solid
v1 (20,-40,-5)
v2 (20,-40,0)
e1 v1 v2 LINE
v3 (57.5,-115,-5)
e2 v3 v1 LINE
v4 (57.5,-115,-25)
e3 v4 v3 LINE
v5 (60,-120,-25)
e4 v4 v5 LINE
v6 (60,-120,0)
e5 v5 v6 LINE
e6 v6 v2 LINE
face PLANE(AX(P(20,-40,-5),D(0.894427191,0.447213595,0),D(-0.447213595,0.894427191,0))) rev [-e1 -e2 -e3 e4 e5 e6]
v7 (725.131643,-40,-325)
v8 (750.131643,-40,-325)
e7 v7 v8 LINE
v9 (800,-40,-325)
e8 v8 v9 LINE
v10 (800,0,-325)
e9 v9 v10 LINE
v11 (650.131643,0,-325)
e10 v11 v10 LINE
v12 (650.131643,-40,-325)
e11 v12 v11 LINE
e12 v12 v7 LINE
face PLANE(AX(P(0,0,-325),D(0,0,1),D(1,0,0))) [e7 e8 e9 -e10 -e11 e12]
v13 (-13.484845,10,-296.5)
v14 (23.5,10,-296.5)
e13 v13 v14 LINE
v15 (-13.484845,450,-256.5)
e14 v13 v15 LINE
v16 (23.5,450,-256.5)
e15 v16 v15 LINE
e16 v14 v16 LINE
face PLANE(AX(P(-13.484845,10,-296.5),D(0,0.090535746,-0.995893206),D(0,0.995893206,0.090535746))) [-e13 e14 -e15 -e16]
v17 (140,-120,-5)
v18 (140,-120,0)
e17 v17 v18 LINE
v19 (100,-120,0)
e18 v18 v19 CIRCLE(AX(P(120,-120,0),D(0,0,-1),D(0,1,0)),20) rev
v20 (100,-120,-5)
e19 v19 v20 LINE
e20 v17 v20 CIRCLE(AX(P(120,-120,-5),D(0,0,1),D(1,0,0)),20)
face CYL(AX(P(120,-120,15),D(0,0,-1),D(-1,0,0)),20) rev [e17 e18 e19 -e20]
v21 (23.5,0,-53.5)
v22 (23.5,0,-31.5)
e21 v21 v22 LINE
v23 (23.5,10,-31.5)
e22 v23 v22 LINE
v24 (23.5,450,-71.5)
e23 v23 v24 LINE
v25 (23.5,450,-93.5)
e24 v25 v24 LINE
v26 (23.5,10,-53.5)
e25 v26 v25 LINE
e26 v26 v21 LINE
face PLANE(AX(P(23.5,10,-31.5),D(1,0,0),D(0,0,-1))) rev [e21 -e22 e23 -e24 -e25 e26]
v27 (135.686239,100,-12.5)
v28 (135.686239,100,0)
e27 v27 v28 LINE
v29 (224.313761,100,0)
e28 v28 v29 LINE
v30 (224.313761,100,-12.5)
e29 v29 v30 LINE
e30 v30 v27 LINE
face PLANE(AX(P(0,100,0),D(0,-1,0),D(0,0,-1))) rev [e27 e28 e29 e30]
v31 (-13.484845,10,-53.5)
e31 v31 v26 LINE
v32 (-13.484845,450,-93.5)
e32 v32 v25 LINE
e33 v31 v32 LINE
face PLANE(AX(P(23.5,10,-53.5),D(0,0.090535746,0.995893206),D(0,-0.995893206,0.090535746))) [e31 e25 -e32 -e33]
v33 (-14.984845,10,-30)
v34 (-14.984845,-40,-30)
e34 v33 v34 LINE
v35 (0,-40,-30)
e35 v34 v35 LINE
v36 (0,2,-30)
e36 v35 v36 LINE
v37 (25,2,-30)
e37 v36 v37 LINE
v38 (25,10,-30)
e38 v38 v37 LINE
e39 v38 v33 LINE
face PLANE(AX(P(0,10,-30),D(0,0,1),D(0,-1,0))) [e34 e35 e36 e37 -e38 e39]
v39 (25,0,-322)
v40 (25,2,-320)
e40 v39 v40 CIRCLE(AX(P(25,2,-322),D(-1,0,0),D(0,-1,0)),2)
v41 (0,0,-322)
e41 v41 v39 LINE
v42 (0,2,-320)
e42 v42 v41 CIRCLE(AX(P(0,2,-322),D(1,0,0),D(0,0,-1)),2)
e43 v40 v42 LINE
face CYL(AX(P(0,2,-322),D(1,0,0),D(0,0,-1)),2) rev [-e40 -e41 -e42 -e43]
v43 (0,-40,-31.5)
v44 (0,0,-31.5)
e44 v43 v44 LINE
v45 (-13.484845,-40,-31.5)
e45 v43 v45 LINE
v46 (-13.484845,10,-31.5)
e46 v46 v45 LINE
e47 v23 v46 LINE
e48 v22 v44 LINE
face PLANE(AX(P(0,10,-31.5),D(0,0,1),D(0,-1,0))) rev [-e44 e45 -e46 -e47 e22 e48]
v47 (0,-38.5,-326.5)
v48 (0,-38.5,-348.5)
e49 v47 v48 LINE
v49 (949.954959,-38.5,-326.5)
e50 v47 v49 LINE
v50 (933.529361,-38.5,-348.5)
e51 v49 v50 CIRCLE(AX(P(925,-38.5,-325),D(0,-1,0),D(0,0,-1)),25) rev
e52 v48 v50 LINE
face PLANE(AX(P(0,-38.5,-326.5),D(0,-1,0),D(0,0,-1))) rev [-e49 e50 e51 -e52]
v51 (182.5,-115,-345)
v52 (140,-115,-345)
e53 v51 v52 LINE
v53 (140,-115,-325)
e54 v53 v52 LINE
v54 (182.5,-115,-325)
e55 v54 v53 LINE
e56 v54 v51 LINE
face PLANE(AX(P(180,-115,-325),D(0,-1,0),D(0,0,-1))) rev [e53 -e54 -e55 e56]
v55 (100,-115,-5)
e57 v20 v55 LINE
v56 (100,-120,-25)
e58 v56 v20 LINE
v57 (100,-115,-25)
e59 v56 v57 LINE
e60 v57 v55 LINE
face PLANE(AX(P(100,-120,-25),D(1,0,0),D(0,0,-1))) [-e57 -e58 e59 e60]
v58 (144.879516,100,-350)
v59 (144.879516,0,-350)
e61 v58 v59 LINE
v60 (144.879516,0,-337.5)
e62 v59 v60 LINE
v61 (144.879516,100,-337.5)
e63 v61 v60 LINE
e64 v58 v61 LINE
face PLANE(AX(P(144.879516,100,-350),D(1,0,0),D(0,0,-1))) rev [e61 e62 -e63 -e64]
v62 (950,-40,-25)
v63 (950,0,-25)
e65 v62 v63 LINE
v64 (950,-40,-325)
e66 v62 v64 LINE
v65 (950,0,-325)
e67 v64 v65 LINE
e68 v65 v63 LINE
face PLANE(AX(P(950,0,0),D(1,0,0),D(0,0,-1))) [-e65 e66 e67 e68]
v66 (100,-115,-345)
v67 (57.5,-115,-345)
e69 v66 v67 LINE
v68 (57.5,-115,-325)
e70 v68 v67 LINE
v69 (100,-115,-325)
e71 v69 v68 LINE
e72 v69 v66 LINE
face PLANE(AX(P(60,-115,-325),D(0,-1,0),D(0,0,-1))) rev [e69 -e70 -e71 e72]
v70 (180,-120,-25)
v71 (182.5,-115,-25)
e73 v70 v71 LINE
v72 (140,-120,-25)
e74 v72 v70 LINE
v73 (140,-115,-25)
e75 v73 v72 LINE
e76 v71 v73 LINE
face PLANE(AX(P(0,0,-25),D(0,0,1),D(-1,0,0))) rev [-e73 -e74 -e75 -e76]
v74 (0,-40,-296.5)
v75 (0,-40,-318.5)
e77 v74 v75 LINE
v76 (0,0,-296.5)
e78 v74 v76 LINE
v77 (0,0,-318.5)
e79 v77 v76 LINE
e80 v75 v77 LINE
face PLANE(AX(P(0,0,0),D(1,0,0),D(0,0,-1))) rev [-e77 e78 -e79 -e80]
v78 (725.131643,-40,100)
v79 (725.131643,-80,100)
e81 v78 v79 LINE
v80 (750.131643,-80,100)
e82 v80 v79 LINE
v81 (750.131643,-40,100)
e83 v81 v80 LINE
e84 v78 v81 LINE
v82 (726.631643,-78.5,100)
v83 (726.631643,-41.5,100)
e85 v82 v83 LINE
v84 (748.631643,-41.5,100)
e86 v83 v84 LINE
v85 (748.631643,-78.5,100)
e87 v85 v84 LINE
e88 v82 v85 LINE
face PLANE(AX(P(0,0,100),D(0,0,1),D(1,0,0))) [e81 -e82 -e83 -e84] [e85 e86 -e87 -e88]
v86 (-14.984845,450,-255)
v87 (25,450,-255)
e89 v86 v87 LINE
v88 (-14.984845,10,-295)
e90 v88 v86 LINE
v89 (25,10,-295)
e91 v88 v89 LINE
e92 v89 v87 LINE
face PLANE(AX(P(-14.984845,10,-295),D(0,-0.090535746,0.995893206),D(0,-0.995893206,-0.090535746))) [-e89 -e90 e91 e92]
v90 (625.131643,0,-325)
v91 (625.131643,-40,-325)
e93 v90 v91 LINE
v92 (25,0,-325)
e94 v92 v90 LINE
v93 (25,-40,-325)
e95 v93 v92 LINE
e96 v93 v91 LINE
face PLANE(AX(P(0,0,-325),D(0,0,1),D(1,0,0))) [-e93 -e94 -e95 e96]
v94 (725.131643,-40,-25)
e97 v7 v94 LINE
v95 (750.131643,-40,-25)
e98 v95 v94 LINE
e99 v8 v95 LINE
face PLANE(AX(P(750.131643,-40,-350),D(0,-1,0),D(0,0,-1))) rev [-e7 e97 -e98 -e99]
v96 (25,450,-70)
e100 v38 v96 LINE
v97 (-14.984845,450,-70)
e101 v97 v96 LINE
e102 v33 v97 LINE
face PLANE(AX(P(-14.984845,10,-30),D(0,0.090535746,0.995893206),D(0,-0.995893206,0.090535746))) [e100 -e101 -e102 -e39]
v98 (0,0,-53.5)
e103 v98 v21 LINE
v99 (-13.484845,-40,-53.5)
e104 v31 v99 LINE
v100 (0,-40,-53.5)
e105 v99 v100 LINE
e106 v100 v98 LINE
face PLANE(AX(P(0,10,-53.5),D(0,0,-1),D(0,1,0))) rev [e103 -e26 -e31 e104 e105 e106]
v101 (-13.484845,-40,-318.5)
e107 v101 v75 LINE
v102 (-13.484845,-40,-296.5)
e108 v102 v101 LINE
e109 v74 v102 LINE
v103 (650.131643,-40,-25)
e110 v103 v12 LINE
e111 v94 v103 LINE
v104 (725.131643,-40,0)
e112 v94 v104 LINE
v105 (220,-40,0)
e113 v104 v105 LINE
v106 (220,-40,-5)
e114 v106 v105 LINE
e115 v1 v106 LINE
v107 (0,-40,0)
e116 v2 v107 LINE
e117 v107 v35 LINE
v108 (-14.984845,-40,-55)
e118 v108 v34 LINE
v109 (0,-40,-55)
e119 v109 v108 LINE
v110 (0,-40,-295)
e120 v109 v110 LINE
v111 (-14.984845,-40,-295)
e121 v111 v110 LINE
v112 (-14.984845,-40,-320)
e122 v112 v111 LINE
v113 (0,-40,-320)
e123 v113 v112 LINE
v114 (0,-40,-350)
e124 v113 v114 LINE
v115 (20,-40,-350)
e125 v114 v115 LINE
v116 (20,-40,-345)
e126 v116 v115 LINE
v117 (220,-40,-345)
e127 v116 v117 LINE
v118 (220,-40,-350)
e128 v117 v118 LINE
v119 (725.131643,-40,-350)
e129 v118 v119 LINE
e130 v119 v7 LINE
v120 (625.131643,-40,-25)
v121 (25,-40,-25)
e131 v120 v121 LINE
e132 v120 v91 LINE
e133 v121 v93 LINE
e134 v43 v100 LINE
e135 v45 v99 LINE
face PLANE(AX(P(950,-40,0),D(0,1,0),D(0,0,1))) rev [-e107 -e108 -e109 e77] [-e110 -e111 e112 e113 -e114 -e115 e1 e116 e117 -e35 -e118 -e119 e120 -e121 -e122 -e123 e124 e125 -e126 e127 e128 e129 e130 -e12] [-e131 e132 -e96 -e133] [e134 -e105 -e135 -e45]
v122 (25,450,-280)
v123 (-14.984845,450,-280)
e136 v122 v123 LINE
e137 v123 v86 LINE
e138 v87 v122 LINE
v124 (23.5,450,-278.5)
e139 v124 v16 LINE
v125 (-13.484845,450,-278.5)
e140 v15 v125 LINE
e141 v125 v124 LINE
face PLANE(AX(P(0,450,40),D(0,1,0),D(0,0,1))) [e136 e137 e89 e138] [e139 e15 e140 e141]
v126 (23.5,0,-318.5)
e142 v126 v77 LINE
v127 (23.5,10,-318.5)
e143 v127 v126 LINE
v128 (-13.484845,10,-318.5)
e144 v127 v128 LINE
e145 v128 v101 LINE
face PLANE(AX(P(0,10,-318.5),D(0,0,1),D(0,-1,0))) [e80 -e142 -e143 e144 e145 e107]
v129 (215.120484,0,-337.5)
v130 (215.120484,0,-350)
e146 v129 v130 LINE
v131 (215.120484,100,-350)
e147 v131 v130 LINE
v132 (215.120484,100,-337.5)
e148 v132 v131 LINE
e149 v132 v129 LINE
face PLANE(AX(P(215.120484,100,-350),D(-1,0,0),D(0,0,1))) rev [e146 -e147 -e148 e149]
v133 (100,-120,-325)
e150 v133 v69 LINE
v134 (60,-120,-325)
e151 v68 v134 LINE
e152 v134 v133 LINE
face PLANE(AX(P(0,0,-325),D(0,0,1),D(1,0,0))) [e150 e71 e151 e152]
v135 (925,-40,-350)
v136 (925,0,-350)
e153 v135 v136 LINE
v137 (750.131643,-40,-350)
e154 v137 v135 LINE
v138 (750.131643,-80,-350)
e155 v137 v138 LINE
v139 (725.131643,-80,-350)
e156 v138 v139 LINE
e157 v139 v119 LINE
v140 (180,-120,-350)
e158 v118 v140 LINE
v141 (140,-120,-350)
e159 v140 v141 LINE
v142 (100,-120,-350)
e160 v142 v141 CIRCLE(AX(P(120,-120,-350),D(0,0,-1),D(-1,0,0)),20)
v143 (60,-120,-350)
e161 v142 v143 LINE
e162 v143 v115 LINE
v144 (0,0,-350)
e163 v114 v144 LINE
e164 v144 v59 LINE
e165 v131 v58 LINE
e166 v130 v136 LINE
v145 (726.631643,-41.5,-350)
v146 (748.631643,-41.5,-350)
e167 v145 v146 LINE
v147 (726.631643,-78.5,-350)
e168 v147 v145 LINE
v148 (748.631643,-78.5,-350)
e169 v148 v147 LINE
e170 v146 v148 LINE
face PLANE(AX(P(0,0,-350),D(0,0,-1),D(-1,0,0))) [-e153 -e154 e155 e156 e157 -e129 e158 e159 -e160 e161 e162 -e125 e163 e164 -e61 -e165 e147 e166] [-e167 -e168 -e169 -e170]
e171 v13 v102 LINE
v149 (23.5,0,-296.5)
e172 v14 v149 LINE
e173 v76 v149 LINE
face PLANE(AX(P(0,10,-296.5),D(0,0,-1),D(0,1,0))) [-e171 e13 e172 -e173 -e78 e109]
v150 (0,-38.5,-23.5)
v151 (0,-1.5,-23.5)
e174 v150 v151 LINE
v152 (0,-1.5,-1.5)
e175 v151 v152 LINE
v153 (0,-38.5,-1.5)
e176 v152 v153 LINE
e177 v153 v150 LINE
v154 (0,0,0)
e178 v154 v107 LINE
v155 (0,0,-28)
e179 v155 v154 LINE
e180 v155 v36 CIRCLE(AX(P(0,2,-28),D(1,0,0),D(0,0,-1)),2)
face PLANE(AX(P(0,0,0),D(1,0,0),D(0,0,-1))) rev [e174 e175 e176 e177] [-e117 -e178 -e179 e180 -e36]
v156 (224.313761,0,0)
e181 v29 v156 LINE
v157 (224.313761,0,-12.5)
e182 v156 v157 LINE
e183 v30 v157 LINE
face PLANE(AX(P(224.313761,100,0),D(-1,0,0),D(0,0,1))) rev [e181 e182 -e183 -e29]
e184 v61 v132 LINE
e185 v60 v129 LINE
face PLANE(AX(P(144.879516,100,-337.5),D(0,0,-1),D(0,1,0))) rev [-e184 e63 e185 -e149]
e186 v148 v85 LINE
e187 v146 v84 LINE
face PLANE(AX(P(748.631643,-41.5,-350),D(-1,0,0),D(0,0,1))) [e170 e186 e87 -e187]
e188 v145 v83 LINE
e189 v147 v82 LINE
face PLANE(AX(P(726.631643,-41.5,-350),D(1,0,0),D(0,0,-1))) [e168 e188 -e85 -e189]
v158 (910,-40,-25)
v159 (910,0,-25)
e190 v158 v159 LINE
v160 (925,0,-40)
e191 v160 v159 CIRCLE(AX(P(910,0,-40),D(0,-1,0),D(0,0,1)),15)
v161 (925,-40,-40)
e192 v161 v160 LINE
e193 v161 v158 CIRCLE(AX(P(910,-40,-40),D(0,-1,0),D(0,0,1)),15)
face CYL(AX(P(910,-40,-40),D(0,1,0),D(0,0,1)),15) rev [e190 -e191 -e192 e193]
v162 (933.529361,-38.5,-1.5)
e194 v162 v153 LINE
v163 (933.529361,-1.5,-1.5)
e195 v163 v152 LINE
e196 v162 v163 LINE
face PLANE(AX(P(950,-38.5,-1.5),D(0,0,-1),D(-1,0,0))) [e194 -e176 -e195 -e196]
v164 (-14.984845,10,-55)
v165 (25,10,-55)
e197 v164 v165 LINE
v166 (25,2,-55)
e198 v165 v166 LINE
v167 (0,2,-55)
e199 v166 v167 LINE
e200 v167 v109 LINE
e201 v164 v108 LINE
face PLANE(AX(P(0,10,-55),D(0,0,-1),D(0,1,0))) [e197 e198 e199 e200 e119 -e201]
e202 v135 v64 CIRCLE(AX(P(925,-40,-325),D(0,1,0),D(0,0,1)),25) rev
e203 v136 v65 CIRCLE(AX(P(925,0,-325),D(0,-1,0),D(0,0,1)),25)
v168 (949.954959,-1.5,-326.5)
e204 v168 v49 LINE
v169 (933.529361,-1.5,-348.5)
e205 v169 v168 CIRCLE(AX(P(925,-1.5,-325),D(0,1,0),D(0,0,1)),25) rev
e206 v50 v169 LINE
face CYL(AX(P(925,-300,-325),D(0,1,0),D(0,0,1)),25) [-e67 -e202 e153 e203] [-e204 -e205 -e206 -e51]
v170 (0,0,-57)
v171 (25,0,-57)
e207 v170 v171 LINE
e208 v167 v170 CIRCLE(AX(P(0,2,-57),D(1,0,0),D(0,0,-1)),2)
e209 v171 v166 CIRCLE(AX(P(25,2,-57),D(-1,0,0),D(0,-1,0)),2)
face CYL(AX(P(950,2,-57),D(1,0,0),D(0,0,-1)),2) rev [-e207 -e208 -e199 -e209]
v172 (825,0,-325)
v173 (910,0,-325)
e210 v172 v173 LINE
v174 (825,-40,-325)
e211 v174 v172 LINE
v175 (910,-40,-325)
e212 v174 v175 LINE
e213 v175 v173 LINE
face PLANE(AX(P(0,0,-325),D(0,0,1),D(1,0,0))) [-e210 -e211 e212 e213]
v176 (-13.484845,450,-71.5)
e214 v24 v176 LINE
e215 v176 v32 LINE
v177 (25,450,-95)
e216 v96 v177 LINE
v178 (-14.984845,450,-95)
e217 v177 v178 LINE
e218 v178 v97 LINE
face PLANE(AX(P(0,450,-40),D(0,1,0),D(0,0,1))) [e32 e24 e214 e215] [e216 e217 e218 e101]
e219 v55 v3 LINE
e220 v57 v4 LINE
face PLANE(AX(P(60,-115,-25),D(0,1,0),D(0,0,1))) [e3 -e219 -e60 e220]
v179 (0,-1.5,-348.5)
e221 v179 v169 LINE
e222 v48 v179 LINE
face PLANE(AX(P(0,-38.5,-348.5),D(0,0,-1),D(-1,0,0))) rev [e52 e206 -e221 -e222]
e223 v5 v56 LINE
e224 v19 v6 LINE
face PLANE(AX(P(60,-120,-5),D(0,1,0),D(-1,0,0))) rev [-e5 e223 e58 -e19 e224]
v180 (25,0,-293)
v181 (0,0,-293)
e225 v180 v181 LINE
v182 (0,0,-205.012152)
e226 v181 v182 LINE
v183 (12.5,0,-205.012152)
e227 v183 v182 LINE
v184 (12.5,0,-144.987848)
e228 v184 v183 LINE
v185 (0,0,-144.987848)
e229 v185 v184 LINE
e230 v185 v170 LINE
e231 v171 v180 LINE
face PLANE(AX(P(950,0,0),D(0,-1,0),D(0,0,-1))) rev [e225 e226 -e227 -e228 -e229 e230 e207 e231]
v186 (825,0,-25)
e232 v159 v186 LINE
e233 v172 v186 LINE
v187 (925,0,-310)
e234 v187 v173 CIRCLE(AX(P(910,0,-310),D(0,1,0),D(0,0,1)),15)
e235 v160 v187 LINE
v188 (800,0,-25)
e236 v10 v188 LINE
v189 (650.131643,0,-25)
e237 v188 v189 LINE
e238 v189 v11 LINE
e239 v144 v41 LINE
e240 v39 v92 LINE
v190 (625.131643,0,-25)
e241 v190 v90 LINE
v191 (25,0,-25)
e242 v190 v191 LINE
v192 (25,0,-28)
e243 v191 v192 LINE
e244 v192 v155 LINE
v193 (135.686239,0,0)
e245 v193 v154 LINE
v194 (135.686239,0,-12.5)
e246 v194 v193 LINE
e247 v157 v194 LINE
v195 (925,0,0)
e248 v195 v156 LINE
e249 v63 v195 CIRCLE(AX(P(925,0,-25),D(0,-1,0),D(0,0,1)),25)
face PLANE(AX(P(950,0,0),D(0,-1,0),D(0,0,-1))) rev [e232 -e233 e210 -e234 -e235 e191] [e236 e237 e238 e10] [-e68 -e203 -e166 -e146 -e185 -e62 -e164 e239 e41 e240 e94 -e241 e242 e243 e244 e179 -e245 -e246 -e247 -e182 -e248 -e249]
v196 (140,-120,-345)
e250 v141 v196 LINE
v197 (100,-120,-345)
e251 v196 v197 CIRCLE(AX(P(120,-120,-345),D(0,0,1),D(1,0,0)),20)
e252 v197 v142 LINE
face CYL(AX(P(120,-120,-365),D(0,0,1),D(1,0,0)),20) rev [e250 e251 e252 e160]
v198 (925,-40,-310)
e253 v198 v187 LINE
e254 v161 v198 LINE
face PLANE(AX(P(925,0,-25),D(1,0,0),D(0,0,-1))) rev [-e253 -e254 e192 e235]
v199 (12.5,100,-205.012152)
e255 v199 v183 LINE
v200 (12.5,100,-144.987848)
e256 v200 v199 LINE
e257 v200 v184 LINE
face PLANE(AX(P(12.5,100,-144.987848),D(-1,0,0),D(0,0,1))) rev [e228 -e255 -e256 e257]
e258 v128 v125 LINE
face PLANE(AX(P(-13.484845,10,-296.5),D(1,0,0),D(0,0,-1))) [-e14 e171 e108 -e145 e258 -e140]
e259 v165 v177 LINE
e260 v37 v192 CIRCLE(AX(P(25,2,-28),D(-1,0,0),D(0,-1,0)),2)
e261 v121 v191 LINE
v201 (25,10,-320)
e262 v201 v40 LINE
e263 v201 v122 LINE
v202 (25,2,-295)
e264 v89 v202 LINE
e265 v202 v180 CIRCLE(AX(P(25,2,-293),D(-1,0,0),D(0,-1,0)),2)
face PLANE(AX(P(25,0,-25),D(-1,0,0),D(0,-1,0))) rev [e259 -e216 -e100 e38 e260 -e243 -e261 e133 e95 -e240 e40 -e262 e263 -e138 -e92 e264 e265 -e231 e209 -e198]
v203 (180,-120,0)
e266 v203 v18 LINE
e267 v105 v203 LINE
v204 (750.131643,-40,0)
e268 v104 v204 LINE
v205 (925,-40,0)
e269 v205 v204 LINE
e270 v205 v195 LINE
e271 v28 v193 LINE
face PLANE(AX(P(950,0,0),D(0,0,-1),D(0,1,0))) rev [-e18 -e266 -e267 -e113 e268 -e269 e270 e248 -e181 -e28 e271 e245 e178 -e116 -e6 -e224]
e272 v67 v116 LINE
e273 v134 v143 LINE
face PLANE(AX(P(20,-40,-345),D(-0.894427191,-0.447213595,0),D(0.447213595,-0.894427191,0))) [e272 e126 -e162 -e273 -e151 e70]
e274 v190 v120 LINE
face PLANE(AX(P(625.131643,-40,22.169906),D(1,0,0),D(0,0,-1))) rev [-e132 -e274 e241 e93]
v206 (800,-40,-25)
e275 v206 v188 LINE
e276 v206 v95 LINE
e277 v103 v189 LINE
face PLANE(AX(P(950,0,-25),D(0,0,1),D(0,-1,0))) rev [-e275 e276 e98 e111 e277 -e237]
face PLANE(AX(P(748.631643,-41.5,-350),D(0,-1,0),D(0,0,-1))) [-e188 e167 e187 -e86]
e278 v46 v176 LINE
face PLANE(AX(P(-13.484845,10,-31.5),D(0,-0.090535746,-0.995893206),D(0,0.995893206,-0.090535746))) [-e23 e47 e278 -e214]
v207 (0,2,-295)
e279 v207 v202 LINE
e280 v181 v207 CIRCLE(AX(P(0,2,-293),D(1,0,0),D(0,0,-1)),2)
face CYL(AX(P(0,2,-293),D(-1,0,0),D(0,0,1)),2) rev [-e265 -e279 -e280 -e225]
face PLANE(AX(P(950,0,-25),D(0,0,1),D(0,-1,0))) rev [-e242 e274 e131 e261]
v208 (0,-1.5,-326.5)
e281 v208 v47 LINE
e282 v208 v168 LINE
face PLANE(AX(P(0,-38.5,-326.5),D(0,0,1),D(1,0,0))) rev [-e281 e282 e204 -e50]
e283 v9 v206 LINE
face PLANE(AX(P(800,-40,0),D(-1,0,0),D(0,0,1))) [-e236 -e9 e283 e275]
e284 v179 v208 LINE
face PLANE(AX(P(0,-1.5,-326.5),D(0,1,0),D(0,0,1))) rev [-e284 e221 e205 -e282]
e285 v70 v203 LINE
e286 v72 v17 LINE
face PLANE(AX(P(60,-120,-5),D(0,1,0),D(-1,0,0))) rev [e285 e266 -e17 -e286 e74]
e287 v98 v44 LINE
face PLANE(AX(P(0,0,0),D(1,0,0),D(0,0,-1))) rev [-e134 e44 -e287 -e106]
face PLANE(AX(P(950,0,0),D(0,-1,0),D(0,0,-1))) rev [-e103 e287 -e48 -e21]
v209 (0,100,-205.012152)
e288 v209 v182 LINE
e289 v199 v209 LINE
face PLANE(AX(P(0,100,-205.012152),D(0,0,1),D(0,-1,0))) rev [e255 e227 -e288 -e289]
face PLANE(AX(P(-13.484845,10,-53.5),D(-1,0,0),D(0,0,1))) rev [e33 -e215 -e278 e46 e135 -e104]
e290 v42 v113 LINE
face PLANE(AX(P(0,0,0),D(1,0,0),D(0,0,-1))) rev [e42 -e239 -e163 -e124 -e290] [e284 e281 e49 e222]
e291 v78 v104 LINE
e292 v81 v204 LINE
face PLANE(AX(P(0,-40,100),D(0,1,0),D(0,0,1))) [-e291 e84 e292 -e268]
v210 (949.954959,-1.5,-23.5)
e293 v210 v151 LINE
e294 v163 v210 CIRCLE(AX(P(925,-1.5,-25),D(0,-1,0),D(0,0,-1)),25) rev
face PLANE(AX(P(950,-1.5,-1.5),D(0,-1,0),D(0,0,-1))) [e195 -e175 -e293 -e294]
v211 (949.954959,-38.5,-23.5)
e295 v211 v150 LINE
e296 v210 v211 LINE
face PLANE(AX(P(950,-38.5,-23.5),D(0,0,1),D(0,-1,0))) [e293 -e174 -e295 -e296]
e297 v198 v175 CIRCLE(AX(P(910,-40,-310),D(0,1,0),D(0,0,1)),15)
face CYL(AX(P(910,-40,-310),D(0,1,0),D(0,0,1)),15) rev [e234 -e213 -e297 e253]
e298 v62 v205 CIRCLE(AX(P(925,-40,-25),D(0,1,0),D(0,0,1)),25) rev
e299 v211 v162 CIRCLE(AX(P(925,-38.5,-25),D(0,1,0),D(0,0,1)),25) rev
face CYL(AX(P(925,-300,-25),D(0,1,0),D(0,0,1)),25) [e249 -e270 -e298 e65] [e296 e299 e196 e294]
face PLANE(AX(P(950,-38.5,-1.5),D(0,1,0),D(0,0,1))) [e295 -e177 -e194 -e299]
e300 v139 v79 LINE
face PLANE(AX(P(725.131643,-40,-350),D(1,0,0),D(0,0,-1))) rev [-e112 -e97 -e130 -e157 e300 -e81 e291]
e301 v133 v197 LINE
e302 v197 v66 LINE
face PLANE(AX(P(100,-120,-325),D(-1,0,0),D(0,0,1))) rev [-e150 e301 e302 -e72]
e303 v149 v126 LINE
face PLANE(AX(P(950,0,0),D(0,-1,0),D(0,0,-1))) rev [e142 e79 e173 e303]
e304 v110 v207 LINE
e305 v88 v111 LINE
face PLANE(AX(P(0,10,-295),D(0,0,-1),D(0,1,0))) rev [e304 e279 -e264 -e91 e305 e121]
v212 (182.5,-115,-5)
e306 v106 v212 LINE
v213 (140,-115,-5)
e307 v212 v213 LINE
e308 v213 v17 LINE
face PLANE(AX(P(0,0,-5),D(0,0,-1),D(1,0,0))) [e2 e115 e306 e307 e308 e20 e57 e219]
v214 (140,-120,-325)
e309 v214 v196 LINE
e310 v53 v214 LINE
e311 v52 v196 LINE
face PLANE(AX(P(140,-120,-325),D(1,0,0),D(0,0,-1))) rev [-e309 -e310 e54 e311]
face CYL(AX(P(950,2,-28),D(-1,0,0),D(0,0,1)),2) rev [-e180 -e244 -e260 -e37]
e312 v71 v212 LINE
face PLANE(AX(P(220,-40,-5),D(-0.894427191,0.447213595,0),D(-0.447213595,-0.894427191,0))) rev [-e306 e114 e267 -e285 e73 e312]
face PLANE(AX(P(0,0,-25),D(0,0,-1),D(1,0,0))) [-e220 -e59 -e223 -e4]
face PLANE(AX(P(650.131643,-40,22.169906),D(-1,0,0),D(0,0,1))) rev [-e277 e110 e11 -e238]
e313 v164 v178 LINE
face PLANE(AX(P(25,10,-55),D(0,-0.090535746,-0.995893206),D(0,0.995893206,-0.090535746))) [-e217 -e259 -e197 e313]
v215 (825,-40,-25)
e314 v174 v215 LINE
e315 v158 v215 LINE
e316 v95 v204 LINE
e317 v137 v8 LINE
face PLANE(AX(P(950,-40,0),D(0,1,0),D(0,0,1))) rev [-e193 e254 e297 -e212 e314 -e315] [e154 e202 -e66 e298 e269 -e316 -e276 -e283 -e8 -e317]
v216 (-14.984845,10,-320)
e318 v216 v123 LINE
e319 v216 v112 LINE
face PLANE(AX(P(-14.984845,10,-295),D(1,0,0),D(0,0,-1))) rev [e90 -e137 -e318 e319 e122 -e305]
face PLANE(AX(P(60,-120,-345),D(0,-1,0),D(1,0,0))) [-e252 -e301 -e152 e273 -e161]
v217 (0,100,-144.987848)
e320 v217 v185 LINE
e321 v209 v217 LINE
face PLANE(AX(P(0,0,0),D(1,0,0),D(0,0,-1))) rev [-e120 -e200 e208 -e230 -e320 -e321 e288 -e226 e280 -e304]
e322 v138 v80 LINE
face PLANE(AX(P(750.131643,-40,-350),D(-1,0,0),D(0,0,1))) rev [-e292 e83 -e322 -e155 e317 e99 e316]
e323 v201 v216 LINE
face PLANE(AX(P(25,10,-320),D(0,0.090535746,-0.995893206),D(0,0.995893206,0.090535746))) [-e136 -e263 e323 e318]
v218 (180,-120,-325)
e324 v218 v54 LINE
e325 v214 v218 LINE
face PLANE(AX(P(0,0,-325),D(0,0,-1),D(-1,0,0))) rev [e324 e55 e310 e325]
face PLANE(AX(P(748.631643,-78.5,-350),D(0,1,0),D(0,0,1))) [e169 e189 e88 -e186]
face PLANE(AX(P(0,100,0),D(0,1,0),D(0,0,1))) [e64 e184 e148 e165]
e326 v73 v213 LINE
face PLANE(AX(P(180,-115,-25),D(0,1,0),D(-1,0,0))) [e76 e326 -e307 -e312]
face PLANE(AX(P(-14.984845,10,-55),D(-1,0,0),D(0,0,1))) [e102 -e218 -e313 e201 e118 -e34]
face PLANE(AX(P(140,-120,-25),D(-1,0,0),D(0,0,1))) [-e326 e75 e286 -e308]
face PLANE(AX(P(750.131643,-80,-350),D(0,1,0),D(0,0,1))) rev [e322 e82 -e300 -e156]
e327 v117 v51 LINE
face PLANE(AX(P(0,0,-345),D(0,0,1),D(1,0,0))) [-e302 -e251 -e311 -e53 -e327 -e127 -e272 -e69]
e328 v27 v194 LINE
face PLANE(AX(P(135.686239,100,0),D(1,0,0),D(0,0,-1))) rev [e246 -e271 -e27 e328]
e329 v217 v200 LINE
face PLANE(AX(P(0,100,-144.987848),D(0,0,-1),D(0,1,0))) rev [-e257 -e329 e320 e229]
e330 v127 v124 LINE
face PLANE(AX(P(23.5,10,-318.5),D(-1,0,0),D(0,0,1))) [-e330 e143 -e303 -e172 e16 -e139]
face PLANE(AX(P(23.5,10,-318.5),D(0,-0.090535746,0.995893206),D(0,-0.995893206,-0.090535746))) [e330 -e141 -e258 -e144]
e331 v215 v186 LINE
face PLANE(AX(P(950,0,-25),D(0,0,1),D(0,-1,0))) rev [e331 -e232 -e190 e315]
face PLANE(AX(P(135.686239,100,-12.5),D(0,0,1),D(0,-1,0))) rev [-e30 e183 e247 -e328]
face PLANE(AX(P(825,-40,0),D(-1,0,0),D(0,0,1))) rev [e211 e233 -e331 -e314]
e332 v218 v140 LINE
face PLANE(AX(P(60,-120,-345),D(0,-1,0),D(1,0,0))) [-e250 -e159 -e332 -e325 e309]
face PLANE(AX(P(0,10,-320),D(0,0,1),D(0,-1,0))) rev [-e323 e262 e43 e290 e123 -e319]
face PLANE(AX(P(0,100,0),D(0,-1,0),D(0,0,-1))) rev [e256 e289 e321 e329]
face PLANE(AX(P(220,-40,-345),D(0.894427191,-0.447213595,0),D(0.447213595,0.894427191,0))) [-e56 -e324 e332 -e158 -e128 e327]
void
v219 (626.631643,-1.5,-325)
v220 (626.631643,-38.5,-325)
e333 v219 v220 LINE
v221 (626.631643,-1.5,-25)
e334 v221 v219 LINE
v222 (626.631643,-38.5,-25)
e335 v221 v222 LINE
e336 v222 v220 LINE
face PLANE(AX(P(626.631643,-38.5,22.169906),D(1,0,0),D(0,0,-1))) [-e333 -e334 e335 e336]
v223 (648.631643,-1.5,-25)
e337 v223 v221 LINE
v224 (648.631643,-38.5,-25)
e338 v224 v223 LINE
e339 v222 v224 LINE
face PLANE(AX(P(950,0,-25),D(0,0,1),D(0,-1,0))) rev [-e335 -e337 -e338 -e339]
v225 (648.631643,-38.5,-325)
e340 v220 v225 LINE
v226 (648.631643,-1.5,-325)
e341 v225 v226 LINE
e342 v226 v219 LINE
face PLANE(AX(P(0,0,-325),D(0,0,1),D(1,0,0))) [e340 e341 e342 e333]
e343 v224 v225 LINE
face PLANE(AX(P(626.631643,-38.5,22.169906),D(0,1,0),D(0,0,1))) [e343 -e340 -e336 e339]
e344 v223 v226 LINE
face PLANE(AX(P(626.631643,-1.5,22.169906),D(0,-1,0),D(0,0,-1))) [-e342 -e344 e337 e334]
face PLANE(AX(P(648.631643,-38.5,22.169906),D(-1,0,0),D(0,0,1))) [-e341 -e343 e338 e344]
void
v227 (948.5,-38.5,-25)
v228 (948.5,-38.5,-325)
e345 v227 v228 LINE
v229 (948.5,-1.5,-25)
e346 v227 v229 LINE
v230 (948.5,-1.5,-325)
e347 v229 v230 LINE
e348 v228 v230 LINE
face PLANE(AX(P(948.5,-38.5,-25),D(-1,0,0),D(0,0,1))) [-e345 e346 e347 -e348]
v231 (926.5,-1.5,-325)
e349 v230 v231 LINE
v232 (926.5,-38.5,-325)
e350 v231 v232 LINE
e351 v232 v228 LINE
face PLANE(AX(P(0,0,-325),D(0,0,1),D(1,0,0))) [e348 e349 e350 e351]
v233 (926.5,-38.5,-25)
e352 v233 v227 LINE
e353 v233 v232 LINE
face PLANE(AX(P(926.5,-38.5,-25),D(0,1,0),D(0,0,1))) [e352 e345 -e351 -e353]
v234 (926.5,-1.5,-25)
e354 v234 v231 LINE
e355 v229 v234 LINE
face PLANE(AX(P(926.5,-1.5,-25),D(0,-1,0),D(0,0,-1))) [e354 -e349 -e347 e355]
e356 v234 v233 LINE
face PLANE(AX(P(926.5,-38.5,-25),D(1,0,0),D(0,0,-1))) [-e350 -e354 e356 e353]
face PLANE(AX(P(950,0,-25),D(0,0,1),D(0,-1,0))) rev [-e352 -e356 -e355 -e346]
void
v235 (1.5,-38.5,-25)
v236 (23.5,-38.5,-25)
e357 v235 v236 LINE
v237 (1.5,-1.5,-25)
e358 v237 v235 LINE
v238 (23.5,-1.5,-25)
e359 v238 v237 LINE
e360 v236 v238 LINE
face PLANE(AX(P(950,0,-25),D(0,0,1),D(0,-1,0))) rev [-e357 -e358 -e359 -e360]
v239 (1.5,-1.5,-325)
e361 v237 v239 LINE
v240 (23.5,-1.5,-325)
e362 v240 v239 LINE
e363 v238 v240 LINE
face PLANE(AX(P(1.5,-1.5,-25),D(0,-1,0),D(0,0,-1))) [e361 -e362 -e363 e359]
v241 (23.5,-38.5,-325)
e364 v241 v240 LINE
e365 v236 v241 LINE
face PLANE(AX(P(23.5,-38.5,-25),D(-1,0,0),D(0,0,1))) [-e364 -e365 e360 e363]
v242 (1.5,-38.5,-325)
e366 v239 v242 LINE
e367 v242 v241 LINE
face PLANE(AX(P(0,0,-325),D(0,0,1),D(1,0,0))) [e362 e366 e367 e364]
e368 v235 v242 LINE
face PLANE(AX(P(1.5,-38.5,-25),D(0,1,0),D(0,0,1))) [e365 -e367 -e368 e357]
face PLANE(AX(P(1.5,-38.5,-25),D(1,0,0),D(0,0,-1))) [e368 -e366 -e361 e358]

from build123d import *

# Parameters (mm, degrees)
SKETCH1_W            = 25
SKETCH1_H            = 40
SKETCH1_W_2          = 22
SKETCH1_H_2          = 37
BOSS_EXTRUDE1_DEPTH  = 950
SKETCH3_W            = 25
SKETCH3_H            = 40
SKETCH3_W_2          = 22
SKETCH3_H_2          = 37
BOSS_EXTRUDE2_DEPTH  = 950
SKETCH4_W            = 25
SKETCH4_H            = 40
SKETCH4_W_2          = 22
SKETCH4_H_2          = 37
BOSS_EXTRUDE3_DEPTH  = 300
SKETCH5_W            = 25
SKETCH5_H            = 40
SKETCH5_W_2          = 22
SKETCH5_H_2          = 37
BOSS_EXTRUDE4_DEPTH  = 300
CUT_EXTRUDE1_DEPTH   = 300
CUT_EXTRUDE2_DEPTH   = 300
BOSS_EXTRUDE5_DEPTH  = 40
BOSS_EXTRUDE6_DEPTH  = 40
SKETCH10_W           = 25
SKETCH10_H           = 300
BOSS_EXTRUDE7_DEPTH  = 40
SKETCH12_W           = 25
SKETCH12_H           = 40
SKETCH12_W_2         = 22
SKETCH12_H_2         = 37
BOSS_EXTRUDE8_DEPTH  = 100
SKETCH14_W           = 25
SKETCH14_H           = 40
SKETCH14_W_2         = 22
SKETCH14_H_2         = 37
BOSS_EXTRUDE9_DEPTH  = 350
SKETCH15_W           = 25
SKETCH15_H           = 40
SKETCH15_W_2         = 22
SKETCH15_H_2         = 37
BOSS_EXTRUDE10_DEPTH = 300
BOSS_EXTRUDE11_DEPTH = 5
BOSS_EXTRUDE12_DEPTH = 20
SKETCH19_R           = 20
CUT_EXTRUDE3_DEPTH   = 20
SKETCH21_W           = 12.5
SKETCH21_H           = 60.024303072
SKETCH21_W_2         = 70.240967534
SKETCH21_H_2         = 12.5
SKETCH21_W_3         = 88.627521068
BOSS_EXTRUDE13_DEPTH = 100
BOSS_EXTRUDE14_DEPTH = 10
FILLET1_R            = 2
FILLET2_R            = 2
FILLET3_R            = 2
FILLET4_R            = 2
BOSS_EXTRUDE15_DEPTH = 40
BOSS_EXTRUDE16_DEPTH = 40
SWEEP1_START         = -14.984844988
SWEEP1_DEPTH         = 39.984844988
SWEEP1_2_DEPTH       = 1.5
SWEEP1_START_2       = 23.5
SWEEP1_3_DEPTH       = 1.5
SWEEP2_START         = -14.984844988
SWEEP2_DEPTH         = 39.984844988
SWEEP2_2_DEPTH       = 1.5
SWEEP2_START_2       = 23.5
SWEEP2_3_DEPTH       = 1.5


# Read off the part's stored shape, not the designer's step: Sweep1, Sweep2
with BuildPart() as part:
    # Sketch1 → Boss-Extrude1 (new body)
    with BuildSketch(Plane(origin=(0, 0, 0), x_dir=(0, 0, -1), z_dir=(1, 0, 0))):
        with Locations((12.5, -20)):
            Rectangle(SKETCH1_W, SKETCH1_H)
        with Locations((12.5, -20)):
            Rectangle(SKETCH1_W_2, SKETCH1_H_2, mode=Mode.SUBTRACT)
    extrude(amount=BOSS_EXTRUDE1_DEPTH)



with BuildPart() as body_2:
    # Sketch3 → Boss-Extrude2 (new body)
    with BuildSketch(Plane(origin=(950, 0, 0), x_dir=(0, 0, -1), z_dir=(1, 0, 0))):
        with Locations((337.5, -20)):
            Rectangle(SKETCH3_W, SKETCH3_H)
        with Locations((337.5, -20)):
            Rectangle(SKETCH3_W_2, SKETCH3_H_2, mode=Mode.SUBTRACT)
    extrude(amount=-BOSS_EXTRUDE2_DEPTH)


with BuildPart() as part_1:
    add(part.part)

    add(body_2.part)  # Boss-Extrude3 merges body 2
    # Sketch4 → Boss-Extrude3 (add)
    with BuildSketch(Plane.XY.offset(-325)):
        with Locations((937.5, -20)):
            Rectangle(SKETCH4_W, SKETCH4_H)
        with Locations((937.5, -20)):
            Rectangle(SKETCH4_W_2, SKETCH4_H_2, mode=Mode.SUBTRACT)
    extrude(amount=BOSS_EXTRUDE3_DEPTH)

    # Sketch5 → Boss-Extrude4 (add)
    with BuildSketch(Plane.XY.offset(-325)):
        with Locations((12.5, -20)):
            Rectangle(SKETCH5_W, SKETCH5_H)
        with Locations((12.5, -20)):
            Rectangle(SKETCH5_W_2, SKETCH5_H_2, mode=Mode.SUBTRACT)
    extrude(amount=BOSS_EXTRUDE4_DEPTH)

    # Sketch6 → Cut-Extrude1 (cut)
    with BuildSketch(Plane(origin=(0, 0, 0), x_dir=(1, 0, 0), z_dir=(0, 1, 0))):
        with BuildLine():
            Line((925, 0), (950, 0))
            Line((950, 0), (950, 25))
            ThreePointArc((950, 25), (942.67766953, 7.32233047), (925, 0))
        make_face()
    extrude(amount=-CUT_EXTRUDE1_DEPTH, mode=Mode.SUBTRACT)

    # Sketch7 → Cut-Extrude2 (cut)
    with BuildSketch(Plane(origin=(0, 0, 0), x_dir=(1, 0, 0), z_dir=(0, 1, 0))):
        with BuildLine():
            Line((950, 325), (950, 350))
            Line((950, 350), (925, 350))
            ThreePointArc((925, 350), (942.67766953, 342.67766953), (950, 325))
        make_face()
    extrude(amount=-CUT_EXTRUDE2_DEPTH, mode=Mode.SUBTRACT)

    # Sketch8 → Boss-Extrude5 (add)
    with BuildSketch(Plane(origin=(0, 0, 0), x_dir=(1, 0, 0), z_dir=(0, 1, 0))):
        with BuildLine():
            Line((910, 25), (925, 25))
            Line((925, 25), (925, 40))
            ThreePointArc((925, 40), (920.606601718, 29.393398282), (910, 25))
        make_face()
    extrude(amount=-BOSS_EXTRUDE5_DEPTH)

    # Sketch9 → Boss-Extrude6 (add)
    with BuildSketch(Plane(origin=(0, 0, 0), x_dir=(1, 0, 0), z_dir=(0, 1, 0))):
        with BuildLine():
            Line((925, 310), (925, 325))
            Line((925, 325), (910, 325))
            ThreePointArc((910, 325), (920.606601718, 320.606601718), (925, 310))
        make_face()
    extrude(amount=-BOSS_EXTRUDE6_DEPTH)

    # Sketch10 → Boss-Extrude7 (add)
    with BuildSketch(Plane(origin=(0, 0, 0), x_dir=(1, 0, 0), z_dir=(0, 1, 0))):
        with Locations((812.5, 175)):
            Rectangle(SKETCH10_W, SKETCH10_H)
    extrude(amount=-BOSS_EXTRUDE7_DEPTH)



with BuildPart() as body_2_2:
    # Sketch12 → Boss-Extrude8 (new body)
    with BuildSketch(Plane.XY):
        with Locations((737.631643114, -60)):
            Rectangle(SKETCH12_W, SKETCH12_H)
        with Locations((737.631643114, -60)):
            Rectangle(SKETCH12_W_2, SKETCH12_H_2, mode=Mode.SUBTRACT)
    extrude(amount=BOSS_EXTRUDE8_DEPTH)


with BuildPart() as part_2:
    add(part_1.part)

    add(body_2_2.part)  # Boss-Extrude9 merges body 2 2
    # Sketch14 → Boss-Extrude9 (add)
    with BuildSketch(Plane(origin=(0, 0, 0), x_dir=(-1, 0, 0), z_dir=(0, 0, -1))):
        with Locations((-737.631643114, -60)):
            Rectangle(SKETCH14_W, SKETCH14_H)
        with Locations((-737.631643114, -60)):
            Rectangle(SKETCH14_W_2, SKETCH14_H_2, mode=Mode.SUBTRACT)
    extrude(amount=BOSS_EXTRUDE9_DEPTH)

    # Sketch15 → Boss-Extrude10 (add)
    with BuildSketch(Plane.XY.offset(-325)):
        with Locations((637.631643114, -20)):
            Rectangle(SKETCH15_W, SKETCH15_H)
        with Locations((637.631643114, -20)):
            Rectangle(SKETCH15_W_2, SKETCH15_H_2, mode=Mode.SUBTRACT)
    extrude(amount=BOSS_EXTRUDE10_DEPTH)

    # Sketch16 → Boss-Extrude11 (add)
    with BuildSketch(Plane(origin=(0, 0, -350), x_dir=(-1, 0, 0), z_dir=(0, 0, -1))):
        Polygon((-20, -40), (-220, -40), (-180, -120), (-60, -120), align=None)
    boss_extrude11 = extrude(amount=-BOSS_EXTRUDE11_DEPTH)

    # Mirror1: Boss-Extrude11 across plane
    add(boss_extrude11.mirror(Plane.XY.offset(-175)))

    # Sketch18 → Boss-Extrude12 (add)
    with BuildSketch(Plane.XY.offset(-345)):
        Polygon((60, -115), (57.5, -115), (60, -120), (100, -120), (100, -115), align=None)
        Polygon((180, -115), (182.5, -115), (180, -120), (140, -120), (140, -115), align=None)
    boss_extrude12 = extrude(amount=BOSS_EXTRUDE12_DEPTH)

    # Sketch19 → Cut-Extrude3 (cut)
    with BuildSketch(Plane.XY.offset(-345)):
        with Locations((120, -120)):
            Circle(SKETCH19_R)
    cut_extrude3 = extrude(amount=-CUT_EXTRUDE3_DEPTH, mode=Mode.SUBTRACT)

    # Mirror2: Boss-Extrude12, Cut-Extrude3 across plane
    add(boss_extrude12.mirror(Plane.XY.offset(-175)))
    add(cut_extrude3.mirror(Plane.XY.offset(-175)), mode=Mode.SUBTRACT)

    # Sketch21 → Boss-Extrude13 (add)
    with BuildSketch(Plane(origin=(0, 0, 0), x_dir=(1, 0, 0), z_dir=(0, 1, 0))):
        with Locations((6.25, 175)):
            Rectangle(SKETCH21_W, SKETCH21_H)
        with Locations((180, 343.75)):
            Rectangle(SKETCH21_W_2, SKETCH21_H_2)
        with Locations((180, 6.25)):
            Rectangle(SKETCH21_W_3, SKETCH21_H_2)
    extrude(amount=BOSS_EXTRUDE13_DEPTH)

    # Sketch22 → Boss-Extrude14 (add)
    with BuildSketch(Plane(origin=(0, 0, 0), x_dir=(1, 0, 0), z_dir=(0, 1, 0))):
        Polygon((0, 320), (25, 320), (25, 295), (0, 295), (-14.984844988, 295), (-14.984844988, 320), align=None)
        Polygon((0, 318.5), (-13.484844988, 318.5), (-13.484844988, 296.5), (0, 296.5), (23.5, 296.5), (23.5, 318.5), align=None, mode=Mode.SUBTRACT)
    boss_extrude14 = extrude(amount=BOSS_EXTRUDE14_DEPTH)

    # Mirror3: Boss-Extrude14 across plane
    add(boss_extrude14.mirror(Plane.XY.offset(-175)))

    # Fillet1
    fillet1_edges = [part_2.edges().sort_by_distance(p)[0] for p in [
        (12.5, 0, -55),
    ]]
    fillet(fillet1_edges, radius=FILLET1_R)

    # Fillet2
    fillet2_edges = [part_2.edges().sort_by_distance(p)[0] for p in [
        (12.5, 0, -295),
    ]]
    fillet(fillet2_edges, radius=FILLET2_R)

    # Fillet3
    fillet3_edges = [part_2.edges().sort_by_distance(p)[0] for p in [
        (12.5, 0, -320),
    ]]
    fillet(fillet3_edges, radius=FILLET3_R)

    # Fillet4
    fillet4_edges = [part_2.edges().sort_by_distance(p)[0] for p in [
        (12.5, 0, -30),
    ]]
    fillet(fillet4_edges, radius=FILLET4_R)

    # Sketch23 → Boss-Extrude15 (add)
    with BuildSketch(Plane.XZ):
        Polygon((0, -31.5), (0, -30), (-14.984844988, -30), (-14.984844988, -55), (0, -55), (0, -53.5), (-13.484844988, -53.5), (-13.484844988, -31.5), align=None)
    extrude(amount=BOSS_EXTRUDE15_DEPTH)

    # Sketch24 → Boss-Extrude16 (add)
    with BuildSketch(Plane.XZ):
        Polygon((0, -296.5), (0, -295), (-14.984844988, -295), (-14.984844988, -320), (0, -320), (0, -318.5), (-13.484844988, -318.5), (-13.484844988, -296.5), align=None)
    extrude(amount=BOSS_EXTRUDE16_DEPTH)

    # Sweep1 outline → Sweep1 (add)
    with BuildSketch(Plane.YZ.offset(SWEEP1_START)):
        Polygon((10, -318.5), (10, -320), (450, -280), (450, -278.5), align=None)
        Polygon((10, -295), (10, -296.5), (450, -256.5), (450, -255), align=None)
    extrude(amount=SWEEP1_DEPTH)

    # Sweep1 2 outline → Sweep1 2 (add)
    with BuildSketch(Plane.YZ.offset(SWEEP1_START)):
        Polygon((10, -296.5), (10, -318.5), (450, -278.5), (450, -256.5), align=None)
    extrude(amount=SWEEP1_2_DEPTH)

    # Sweep1 3 outline → Sweep1 3 (add)
    with BuildSketch(Plane.YZ.offset(SWEEP1_START_2)):
        Polygon((10, -296.5), (10, -318.5), (450, -278.5), (450, -256.5), align=None)
    extrude(amount=SWEEP1_3_DEPTH)

    # Sweep2 outline → Sweep2 (add)
    with BuildSketch(Plane.YZ.offset(SWEEP2_START)):
        Polygon((10, -55), (450, -95), (450, -93.5), (10, -53.5), align=None)
        Polygon((10, -31.5), (450, -71.5), (450, -70), (10, -30), align=None)
    extrude(amount=SWEEP2_DEPTH)

    # Sweep2 2 outline → Sweep2 2 (add)
    with BuildSketch(Plane.YZ.offset(SWEEP2_START)):
        Polygon((10, -53.5), (450, -93.5), (450, -71.5), (10, -31.5), align=None)
    extrude(amount=SWEEP2_2_DEPTH)

    # Sweep2 3 outline → Sweep2 3 (add)
    with BuildSketch(Plane.YZ.offset(SWEEP2_START_2)):
        Polygon((10, -53.5), (450, -93.5), (450, -71.5), (10, -31.5), align=None)
    extrude(amount=SWEEP2_3_DEPTH)


solid = part_2.part
